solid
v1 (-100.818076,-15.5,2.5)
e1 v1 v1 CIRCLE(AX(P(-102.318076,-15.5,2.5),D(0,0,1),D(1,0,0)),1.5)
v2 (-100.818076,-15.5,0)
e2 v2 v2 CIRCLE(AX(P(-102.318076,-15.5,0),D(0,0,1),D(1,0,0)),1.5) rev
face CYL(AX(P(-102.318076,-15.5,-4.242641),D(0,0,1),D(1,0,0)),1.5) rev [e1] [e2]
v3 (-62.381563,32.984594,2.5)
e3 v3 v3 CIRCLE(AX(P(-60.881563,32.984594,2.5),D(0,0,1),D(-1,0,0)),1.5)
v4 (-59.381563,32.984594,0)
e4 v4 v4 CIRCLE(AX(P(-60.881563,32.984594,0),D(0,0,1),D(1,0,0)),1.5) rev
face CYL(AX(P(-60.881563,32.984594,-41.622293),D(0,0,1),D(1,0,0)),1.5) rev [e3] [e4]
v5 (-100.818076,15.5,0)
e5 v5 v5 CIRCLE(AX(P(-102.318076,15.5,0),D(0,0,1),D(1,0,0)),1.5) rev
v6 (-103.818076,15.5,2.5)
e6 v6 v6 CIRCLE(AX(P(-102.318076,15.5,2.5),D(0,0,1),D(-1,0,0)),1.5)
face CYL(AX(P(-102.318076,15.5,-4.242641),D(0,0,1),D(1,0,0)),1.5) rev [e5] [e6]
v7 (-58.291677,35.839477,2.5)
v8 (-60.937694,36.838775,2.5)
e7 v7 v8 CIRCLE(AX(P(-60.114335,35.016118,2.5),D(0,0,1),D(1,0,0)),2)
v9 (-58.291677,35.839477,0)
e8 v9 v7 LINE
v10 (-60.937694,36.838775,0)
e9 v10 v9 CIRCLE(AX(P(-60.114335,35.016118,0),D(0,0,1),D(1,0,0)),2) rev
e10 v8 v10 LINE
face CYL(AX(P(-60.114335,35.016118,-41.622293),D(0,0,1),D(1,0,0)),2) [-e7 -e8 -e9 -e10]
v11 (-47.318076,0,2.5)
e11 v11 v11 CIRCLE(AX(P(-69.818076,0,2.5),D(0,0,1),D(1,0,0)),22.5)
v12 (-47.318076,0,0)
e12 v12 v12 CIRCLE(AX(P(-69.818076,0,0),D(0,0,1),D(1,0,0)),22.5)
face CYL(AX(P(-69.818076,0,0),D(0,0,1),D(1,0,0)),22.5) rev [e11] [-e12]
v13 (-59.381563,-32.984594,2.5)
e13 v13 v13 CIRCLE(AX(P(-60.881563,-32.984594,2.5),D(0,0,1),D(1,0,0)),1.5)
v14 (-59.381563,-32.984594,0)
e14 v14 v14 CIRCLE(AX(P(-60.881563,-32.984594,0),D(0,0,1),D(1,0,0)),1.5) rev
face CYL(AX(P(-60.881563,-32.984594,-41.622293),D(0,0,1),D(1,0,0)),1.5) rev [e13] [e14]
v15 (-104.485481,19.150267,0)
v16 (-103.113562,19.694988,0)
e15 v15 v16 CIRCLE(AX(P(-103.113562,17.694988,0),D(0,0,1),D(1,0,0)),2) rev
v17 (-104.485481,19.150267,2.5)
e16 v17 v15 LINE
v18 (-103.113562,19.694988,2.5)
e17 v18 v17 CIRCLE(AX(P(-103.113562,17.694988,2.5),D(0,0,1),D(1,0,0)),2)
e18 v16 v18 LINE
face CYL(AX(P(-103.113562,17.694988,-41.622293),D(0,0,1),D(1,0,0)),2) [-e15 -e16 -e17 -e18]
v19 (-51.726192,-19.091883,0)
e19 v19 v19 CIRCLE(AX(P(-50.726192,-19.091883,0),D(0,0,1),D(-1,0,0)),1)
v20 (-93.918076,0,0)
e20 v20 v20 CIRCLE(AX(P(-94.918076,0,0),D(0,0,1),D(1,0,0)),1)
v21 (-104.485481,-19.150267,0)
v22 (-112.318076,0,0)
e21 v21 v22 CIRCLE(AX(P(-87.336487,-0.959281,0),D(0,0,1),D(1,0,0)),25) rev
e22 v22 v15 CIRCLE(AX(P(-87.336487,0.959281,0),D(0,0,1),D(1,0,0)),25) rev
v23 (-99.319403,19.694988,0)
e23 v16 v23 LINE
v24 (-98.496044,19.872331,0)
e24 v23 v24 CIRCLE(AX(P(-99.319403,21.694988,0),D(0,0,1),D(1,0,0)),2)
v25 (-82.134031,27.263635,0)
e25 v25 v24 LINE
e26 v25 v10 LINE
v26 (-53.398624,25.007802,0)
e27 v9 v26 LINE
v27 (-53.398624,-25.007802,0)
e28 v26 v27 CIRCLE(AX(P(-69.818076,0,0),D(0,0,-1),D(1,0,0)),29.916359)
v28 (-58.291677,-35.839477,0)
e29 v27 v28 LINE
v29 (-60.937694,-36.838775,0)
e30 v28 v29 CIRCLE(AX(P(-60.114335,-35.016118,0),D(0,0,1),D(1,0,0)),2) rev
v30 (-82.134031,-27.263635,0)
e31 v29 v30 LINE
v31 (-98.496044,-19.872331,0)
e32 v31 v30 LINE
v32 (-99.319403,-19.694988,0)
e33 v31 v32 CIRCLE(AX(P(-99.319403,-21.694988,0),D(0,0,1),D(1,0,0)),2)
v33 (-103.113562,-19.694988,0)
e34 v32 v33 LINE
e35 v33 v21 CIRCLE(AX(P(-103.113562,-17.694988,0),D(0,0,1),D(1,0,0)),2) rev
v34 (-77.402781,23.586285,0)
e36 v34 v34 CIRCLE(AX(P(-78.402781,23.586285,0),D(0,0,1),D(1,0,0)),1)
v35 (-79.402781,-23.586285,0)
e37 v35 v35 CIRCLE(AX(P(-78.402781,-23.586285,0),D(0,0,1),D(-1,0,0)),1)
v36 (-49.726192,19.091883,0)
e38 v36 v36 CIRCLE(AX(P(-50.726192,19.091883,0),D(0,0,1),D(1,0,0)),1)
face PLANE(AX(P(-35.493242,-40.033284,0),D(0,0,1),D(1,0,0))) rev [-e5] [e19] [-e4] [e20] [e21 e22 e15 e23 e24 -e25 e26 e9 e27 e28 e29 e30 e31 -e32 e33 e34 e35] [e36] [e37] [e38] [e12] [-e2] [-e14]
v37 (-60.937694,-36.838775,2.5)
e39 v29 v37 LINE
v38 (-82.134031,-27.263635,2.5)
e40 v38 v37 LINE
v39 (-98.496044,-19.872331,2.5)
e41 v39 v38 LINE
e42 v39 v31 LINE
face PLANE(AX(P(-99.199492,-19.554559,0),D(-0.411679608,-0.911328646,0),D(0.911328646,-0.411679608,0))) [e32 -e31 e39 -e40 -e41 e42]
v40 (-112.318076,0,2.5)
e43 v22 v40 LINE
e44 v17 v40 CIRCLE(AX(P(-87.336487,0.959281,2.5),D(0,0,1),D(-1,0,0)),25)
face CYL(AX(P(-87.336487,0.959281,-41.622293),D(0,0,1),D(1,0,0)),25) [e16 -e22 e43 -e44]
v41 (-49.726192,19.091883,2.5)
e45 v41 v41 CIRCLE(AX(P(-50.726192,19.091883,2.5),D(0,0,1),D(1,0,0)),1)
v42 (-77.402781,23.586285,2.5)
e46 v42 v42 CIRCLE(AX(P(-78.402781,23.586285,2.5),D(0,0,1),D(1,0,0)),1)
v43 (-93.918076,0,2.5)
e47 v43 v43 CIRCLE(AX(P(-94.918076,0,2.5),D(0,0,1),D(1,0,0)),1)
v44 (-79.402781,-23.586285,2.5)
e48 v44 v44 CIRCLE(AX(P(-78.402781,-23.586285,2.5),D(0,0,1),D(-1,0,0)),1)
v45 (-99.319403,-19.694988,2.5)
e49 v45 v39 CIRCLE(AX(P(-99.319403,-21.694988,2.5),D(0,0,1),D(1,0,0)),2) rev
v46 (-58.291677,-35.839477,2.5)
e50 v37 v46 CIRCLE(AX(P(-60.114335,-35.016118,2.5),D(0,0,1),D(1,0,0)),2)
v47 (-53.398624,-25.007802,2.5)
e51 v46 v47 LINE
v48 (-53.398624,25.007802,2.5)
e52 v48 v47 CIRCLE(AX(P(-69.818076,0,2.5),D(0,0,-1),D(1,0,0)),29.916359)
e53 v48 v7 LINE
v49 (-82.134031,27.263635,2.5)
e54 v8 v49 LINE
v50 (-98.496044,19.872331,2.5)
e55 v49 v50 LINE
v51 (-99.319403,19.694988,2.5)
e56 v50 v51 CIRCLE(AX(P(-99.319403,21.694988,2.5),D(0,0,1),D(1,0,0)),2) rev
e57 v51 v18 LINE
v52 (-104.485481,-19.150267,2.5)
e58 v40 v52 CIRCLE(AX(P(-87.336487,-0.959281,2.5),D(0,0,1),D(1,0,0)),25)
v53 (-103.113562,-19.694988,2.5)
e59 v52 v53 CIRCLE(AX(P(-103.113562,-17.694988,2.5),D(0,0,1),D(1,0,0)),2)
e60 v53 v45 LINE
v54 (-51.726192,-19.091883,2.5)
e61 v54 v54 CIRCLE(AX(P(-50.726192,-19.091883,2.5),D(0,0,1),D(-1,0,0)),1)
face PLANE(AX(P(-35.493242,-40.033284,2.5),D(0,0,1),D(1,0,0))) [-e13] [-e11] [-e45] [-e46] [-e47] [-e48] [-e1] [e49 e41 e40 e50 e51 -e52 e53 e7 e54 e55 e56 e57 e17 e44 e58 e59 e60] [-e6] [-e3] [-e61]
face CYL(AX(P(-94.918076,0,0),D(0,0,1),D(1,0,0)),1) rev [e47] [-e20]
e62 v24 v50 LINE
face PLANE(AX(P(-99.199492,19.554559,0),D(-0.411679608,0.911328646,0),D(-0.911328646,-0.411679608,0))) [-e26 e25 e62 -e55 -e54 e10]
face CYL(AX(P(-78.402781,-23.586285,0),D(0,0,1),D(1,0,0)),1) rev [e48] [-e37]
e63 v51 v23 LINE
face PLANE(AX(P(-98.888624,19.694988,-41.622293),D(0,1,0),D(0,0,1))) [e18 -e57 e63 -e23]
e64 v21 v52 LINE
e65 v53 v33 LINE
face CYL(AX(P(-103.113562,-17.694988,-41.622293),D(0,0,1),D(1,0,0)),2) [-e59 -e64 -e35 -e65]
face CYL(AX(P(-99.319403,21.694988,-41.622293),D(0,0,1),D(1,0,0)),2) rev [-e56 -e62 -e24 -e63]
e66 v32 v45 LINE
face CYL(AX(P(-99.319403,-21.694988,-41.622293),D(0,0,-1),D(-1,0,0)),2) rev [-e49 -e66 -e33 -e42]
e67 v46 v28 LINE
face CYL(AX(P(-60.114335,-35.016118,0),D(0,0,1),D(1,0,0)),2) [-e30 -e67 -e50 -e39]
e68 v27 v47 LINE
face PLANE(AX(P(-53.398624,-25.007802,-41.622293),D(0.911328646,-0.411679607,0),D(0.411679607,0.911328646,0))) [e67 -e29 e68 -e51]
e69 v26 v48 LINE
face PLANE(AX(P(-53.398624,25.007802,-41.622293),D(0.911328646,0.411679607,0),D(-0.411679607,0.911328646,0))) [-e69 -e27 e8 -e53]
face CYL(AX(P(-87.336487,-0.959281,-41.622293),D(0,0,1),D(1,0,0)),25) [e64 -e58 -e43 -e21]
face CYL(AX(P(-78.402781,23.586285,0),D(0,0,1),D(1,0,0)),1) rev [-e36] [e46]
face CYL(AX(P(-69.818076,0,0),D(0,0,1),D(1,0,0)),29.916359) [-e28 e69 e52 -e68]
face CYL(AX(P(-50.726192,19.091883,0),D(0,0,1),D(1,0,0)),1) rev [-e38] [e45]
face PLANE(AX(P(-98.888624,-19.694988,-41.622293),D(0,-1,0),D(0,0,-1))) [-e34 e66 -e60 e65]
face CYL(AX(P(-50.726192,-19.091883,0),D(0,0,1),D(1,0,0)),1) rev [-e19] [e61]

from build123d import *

# Parameters (mm, degrees)
CROQUIS1_R              = 2.25
CROQUIS1_R_2            = 3
CROQUIS1_R_3            = 1.5
CROQUIS1_R_4            = 2.249997567
SALIENTE_EXTRUIR1_DEPTH = 2.5
SALIENTE_EXTRUIR3_START = -2.5
CROQUIS6_R              = 2.250000066
CROQUIS6_R_2            = 1.5
CROQUIS6_R_3            = 2.25
SALIENTE_EXTRUIR3_DEPTH = 2.5
CROQUIS5_R              = 22.5
CROQUIS5_R_2            = 1
CORTAR_EXTRUIR5_DEPTH   = 2.5
CORTAR_EXTRUIR6_DEPTH   = 2.5
SALIENTE_EXTRUIR4_START = -2.5
CROQUIS11_R             = 1.5
CROQUIS11_R_2           = 1.500000006
SALIENTE_EXTRUIR4_DEPTH = 2.5
REDONDEO1_START         = -1
REDONDEO1_DEPTH         = 4
REDONDEO1_2_DEPTH       = 2.5
CROQUIS12_R             = 1.5
CORTAR_EXTRUIR7_DEPTH   = 2.5


with BuildPart() as part:
    # Croquis1 → Saliente-Extruir1 (new body)
    with BuildSketch(Plane.XY):
        with BuildLine():
            Line((-29.502526327, -44.949972179), (-23.17778065, -37.243838032))
            ThreePointArc((-23.17778065, -37.243838032), (-18.839723212, -32.444384768), (-14.046056443, -28.099933953))
            ThreePointArc((-14.046056443, -28.099933953), (-12.991422185, -27.658257217), (-11.867164621, -27.866527921))
            ThreePointArc((-11.867164621, -27.866527921), (-11.203313373, -28.112469078), (-10.500314, -28.196))
            Line((-10.500314, -28.196), (10.499686, -28.196))
            ThreePointArc((10.499686, -28.196), (11.203007921, -28.112542722), (11.867164264, -27.866528101))
            ThreePointArc((11.867164264, -27.866528101), (12.991422421, -27.658256674), (14.046057406, -28.099933523))
            ThreePointArc((14.046057406, -28.099933523), (18.839775902, -32.444337151), (23.177889012, -37.243749049))
            Line((23.177889012, -37.243749049), (29.502526012, -44.949972049))
            ThreePointArc((29.502526012, -44.949972049), (40.113877497, -46.255199126), (41.931739547, -35.719556022))
            Line((41.931739547, -35.719556022), (21.72923101, -5.566101046))
            ThreePointArc((21.72923101, -5.566101046), (20.036969431, -9.5e-08), (21.729230693, 5.566100954))
            Line((21.729230693, 5.566100954), (41.931739693, 35.719555954))
            ThreePointArc((41.931739693, 35.719555954), (40.113877277, 46.255198335), (29.502526336, 44.949972165))
            Line((29.502526336, 44.949972165), (23.17778065, 37.243838007))
            ThreePointArc((23.17778065, 37.243838007), (18.839723212, 32.444384742), (14.046056443, 28.099933927))
            ThreePointArc((14.046056443, 28.099933927), (12.991421988, 27.658257139), (11.867164252, 27.866528027))
            ThreePointArc((11.867164252, 27.866528027), (11.203313175, 28.112469073), (10.500314, 28.195999974))
            Line((10.500314, 28.195999974), (-10.500314, 28.195999974))
            ThreePointArc((-10.500314, 28.195999974), (-11.203313178, 28.112469098), (-11.867164264, 27.866528075))
            ThreePointArc((-11.867164264, 27.866528075), (-12.991422421, 27.658256648), (-14.046057406, 28.099933497))
            ThreePointArc((-14.046057406, 28.099933497), (-18.839775902, 32.444337126), (-23.177889012, 37.243749023))
            Line((-23.177889012, 37.243749023), (-29.502526012, 44.949972023))
            ThreePointArc((-29.502526012, 44.949972023), (-40.146302424, 46.230987494), (-41.886340556, 35.652554517))
            ThreePointArc((-41.886340556, 35.652554517), (-41.288874902, 25.337679941), (-50.13550001, 20.000000021))
            Line((-50.13550001, 20.000000021), (-97.31807601, 20.000000021))
            ThreePointArc((-97.31807601, 20.000000021), (-99.1994919, 19.554558541), (-100.681450855, 18.312809163))
            add(Edge.make_bspline(
                [(-107.31807554, 2.1e-08), (-107.252414123, 7.059743944), (-104.975710329, 13.164639039), (-100.681450855, 18.312809163)],
                knots=[0, 0, 0, 0, 1, 1, 1, 1], degree=3))
            add(Edge.make_bspline(
                [(-107.31807554, 2.1e-08), (-107.252414123, -7.059743902), (-104.975710329, -13.164638997), (-100.681450855, -18.312809121)],
                knots=[0, 0, 0, 0, 1, 1, 1, 1], degree=3))
            ThreePointArc((-100.681450855, -18.312809121), (-99.19949186, -19.554558345), (-97.31807601, -19.9999997))
            Line((-97.31807601, -19.9999997), (-50.13550001, -19.9999997))
            ThreePointArc((-50.13550001, -19.9999997), (-41.288874902, -25.33767962), (-41.886340556, -35.652554196))
            ThreePointArc((-41.886340556, -35.652554196), (-40.146302646, -46.230987042), (-29.502526327, -44.949972179))
        make_face()
        with Locations((-25.371621, 27.641642)):
            Circle(CROQUIS1_R, mode=Mode.SUBTRACT)
        with Locations((-35.493242035, 40.033284004)):
            Circle(CROQUIS1_R, mode=Mode.SUBTRACT)
        with Locations((-35.49324201, -40.0332837)):
            Circle(CROQUIS1_R, mode=Mode.SUBTRACT)
        with Locations((15.25, -15.25)):
            Circle(CROQUIS1_R_2, mode=Mode.SUBTRACT)
        with Locations((35.493242035, -40.03328403)):
            Circle(CROQUIS1_R, mode=Mode.SUBTRACT)
        with Locations((-15.25, 15.25)):
            Circle(CROQUIS1_R_2, mode=Mode.SUBTRACT)
        with Locations((-25.371621, -27.641642)):
            Circle(CROQUIS1_R, mode=Mode.SUBTRACT)
        with Locations((-35.318076, 15.5)):
            Circle(CROQUIS1_R_3, mode=Mode.SUBTRACT)
        with Locations((25.371621, -27.641642)):
            Circle(CROQUIS1_R, mode=Mode.SUBTRACT)
        with Locations((-15.25, -15.25)):
            Circle(CROQUIS1_R_2, mode=Mode.SUBTRACT)
        with Locations((-97.318076, 15.5)):
            Circle(CROQUIS1_R_3, mode=Mode.SUBTRACT)
        with Locations((15.25, 15.25)):
            Circle(CROQUIS1_R_2, mode=Mode.SUBTRACT)
        with Locations((-35.318076, -15.5)):
            Circle(CROQUIS1_R_3, mode=Mode.SUBTRACT)
        with Locations((25.371621, 27.641642)):
            Circle(CROQUIS1_R, mode=Mode.SUBTRACT)
        with Locations((-97.318076, -15.5)):
            Circle(CROQUIS1_R_3, mode=Mode.SUBTRACT)
        with Locations((35.493241695, 40.03328329)):
            Circle(CROQUIS1_R_4, mode=Mode.SUBTRACT)
        with BuildLine():
            Line((10.499686, -24.196), (-10.500314, -24.196))
            ThreePointArc((-10.500314, -24.196), (-11.500314, -25.196), (-10.500314, -26.196))
            Line((-10.500314, -26.196), (10.499686, -26.196))
            ThreePointArc((10.499686, -26.196), (11.499686, -25.196), (10.499686, -24.196))
        make_face(mode=Mode.SUBTRACT)
        with BuildLine():
            Line((10.499686, 24.196), (-10.500314, 24.196))
            ThreePointArc((-10.500314, 24.196), (-11.500314, 25.196), (-10.500314, 26.196))
            Line((-10.500314, 26.196), (10.499686, 26.196))
            ThreePointArc((10.499686, 26.196), (11.499686, 25.196), (10.499686, 24.196))
        make_face(mode=Mode.SUBTRACT)
    extrude(amount=SALIENTE_EXTRUIR1_DEPTH)


with BuildPart() as saliente_extruir3_tool:
    # Croquis6 → Saliente-Extruir3 (new body)
    # profile 1 of 10: a face of its own
    with BuildSketch(Plane.XY.offset(2.5).offset(SALIENTE_EXTRUIR3_START)):
        with Locations((-35.493242163, 40.033284025)):
            Circle(CROQUIS6_R)
        with Locations((-35.493242163, 40.033284025)):
            Circle(CROQUIS6_R_2, mode=Mode.SUBTRACT)
    # profile 2 of 10: a face of its own
    with BuildSketch(Plane.XY.offset(2.5).offset(SALIENTE_EXTRUIR3_START)):
        with Locations((-25.371621, 27.641642)):
            Circle(CROQUIS6_R_3)
        with Locations((-25.371621, 27.641642)):
            Circle(CROQUIS6_R_2, mode=Mode.SUBTRACT)
    # profile 3 of 10: a face of its own
    with BuildSketch(Plane.XY.offset(2.5).offset(SALIENTE_EXTRUIR3_START)):
        with Locations((25.371621, 27.641642)):
            Circle(CROQUIS6_R_3)
        with Locations(Location((25.371621, 27.641642, 0), (0, 0, 180))):
            Circle(CROQUIS6_R_2, mode=Mode.SUBTRACT)
    # profile 4 of 10: a face of its own
    with BuildSketch(Plane.XY.offset(2.5).offset(SALIENTE_EXTRUIR3_START)):
        with Locations((35.493242163, 40.033284025)):
            Circle(CROQUIS6_R)
        with Locations(Location((35.493242163, 40.033284025, 0), (0, 0, 180))):
            Circle(CROQUIS6_R_2, mode=Mode.SUBTRACT)
    # profile 5 of 10: a face of its own
    with BuildSketch(Plane.XY.offset(2.5).offset(SALIENTE_EXTRUIR3_START)):
        with Locations((35.493242163, -40.033284025)):
            Circle(CROQUIS6_R)
        with Locations((35.493242163, -40.033284025)):
            Circle(CROQUIS6_R_2, mode=Mode.SUBTRACT)
    # profile 6 of 10: a face of its own
    with BuildSketch(Plane.XY.offset(2.5).offset(SALIENTE_EXTRUIR3_START)):
        with Locations((25.371621, -27.641642)):
            Circle(CROQUIS6_R_3)
        with Locations((25.371621, -27.641642)):
            Circle(CROQUIS6_R_2, mode=Mode.SUBTRACT)
    # profile 7 of 10: a face of its own
    with BuildSketch(Plane.XY.offset(2.5).offset(SALIENTE_EXTRUIR3_START)):
        with Locations((-25.371621, -27.641642)):
            Circle(CROQUIS6_R_3)
        with Locations(Location((-25.371621, -27.641642, 0), (0, 0, 180))):
            Circle(CROQUIS6_R_2, mode=Mode.SUBTRACT)
    # profile 8 of 10: a face of its own
    with BuildSketch(Plane.XY.offset(2.5).offset(SALIENTE_EXTRUIR3_START)):
        with Locations((-35.493242163, -40.033284025)):
            Circle(CROQUIS6_R)
        with Locations(Location((-35.493242163, -40.033284025, 0), (0, 0, 180))):
            Circle(CROQUIS6_R_2, mode=Mode.SUBTRACT)
    # profile 9 of 10: a face of its own
    with BuildSketch(Plane.XY.offset(2.5).offset(SALIENTE_EXTRUIR3_START)):
        with BuildLine():
            Line((-99.1994919, 19.554558541), (-40.146302424, 46.230987494))
            ThreePointArc((-40.146302424, 46.230987494), (-43.140478024, 41.291171845), (-41.886340556, 35.652554517))
            ThreePointArc((-41.886340556, 35.652554517), (-41.288875033, 25.33768001), (-50.13550001, 20.000000021))
            Line((-50.13550001, 20.000000021), (-97.31807601, 20.000000021))
            ThreePointArc((-97.31807601, 20.000000021), (-98.214581153, 19.590579436), (-99.1994919, 19.554558541))
        make_face()
    # profile 10 of 10: a face of its own
    with BuildSketch(Plane.XY.offset(2.5).offset(SALIENTE_EXTRUIR3_START)):
        with BuildLine():
            Line((-50.13550001, -20.000000021), (-97.31807601, -20.000000021))
            ThreePointArc((-97.31807601, -20.000000021), (-98.214581153, -19.590579436), (-99.1994919, -19.554558541))
            Line((-99.1994919, -19.554558541), (-40.146302424, -46.230987494))
            ThreePointArc((-40.146302424, -46.230987494), (-43.140478024, -41.291171845), (-41.886340556, -35.652554517))
            ThreePointArc((-41.886340556, -35.652554517), (-41.288875033, -25.33768001), (-50.13550001, -20.000000021))
        make_face()
    extrude(amount=SALIENTE_EXTRUIR3_DEPTH)


with BuildPart() as part_1:
    add(part.part)


with BuildPart() as part_2:
    # Saliente-Extruir3: joined with saliente_extruir3_tool
    add(part_1.part.fuse(saliente_extruir3_tool.part, tol=0.00001))

    # Croquis5 → Cortar-Extruir5 (cut)
    with BuildSketch(Plane.XY.offset(2.5)):
        with Locations((-69.81807554, 2.1e-08)):
            Circle(CROQUIS5_R)
        with Locations((-78.402781137, 23.586284803)):
            Circle(CROQUIS5_R_2)
        with Locations((-94.91807554, 2.1e-08)):
            Circle(CROQUIS5_R_2)
        with Locations(Location((-78.402781137, -23.586284761, 0), (0, 0, 180))):
            Circle(CROQUIS5_R_2)
        with Locations((-50.726192448, 19.091883113)):
            Circle(CROQUIS5_R_2)
        with Locations(Location((-50.726192448, -19.091883071, 0), (0, 0, 180))):
            Circle(CROQUIS5_R_2)
    extrude(amount=-CORTAR_EXTRUIR5_DEPTH, mode=Mode.SUBTRACT)

    # Croquis10 → Cortar-Extruir6 (cut)
    with BuildSketch(Plane.XY.offset(2.5)):
        with BuildLine():
            ThreePointArc((-82.134030611, -27.263635217), (-39.901716207, 2.1e-08), (-82.134030596, 27.263635224))
            ThreePointArc((-82.134030596, 27.263635224), (79.537301339, -4.3e-08), (-82.134030611, -27.263635217))
        make_face()
    extrude(amount=-CORTAR_EXTRUIR6_DEPTH, mode=Mode.SUBTRACT)

    # Croquis11 → Saliente-Extruir4 (add)
    # profile 1 of 5: a face of its own
    with BuildSketch(Plane.XY.offset(2.5).offset(SALIENTE_EXTRUIR4_START)):
        with Locations((-97.318076, 15.5)):
            Circle(CROQUIS11_R)
    # profile 2 of 5: a face of its own
    with BuildSketch(Plane.XY.offset(2.5).offset(SALIENTE_EXTRUIR4_START)):
        with Locations((-97.318076, -15.5)):
            Circle(CROQUIS11_R)
    # profile 3 of 5: a face of its own
    with BuildSketch(Plane.XY.offset(2.5).offset(SALIENTE_EXTRUIR4_START)):
        with BuildLine():
            Line((-82.134030604, -27.263635221), (-59.115036511, -37.6621347))
            Line((-59.115036511, -37.6621347), (-53.398623675, -25.007801874))
            ThreePointArc((-53.398623675, -25.007801874), (-67.476736709, -29.824598689), (-82.134030604, -27.263635221))
        make_face()
        with Locations((-60.881562628, -32.984594162)):
            Circle(CROQUIS11_R_2, mode=Mode.SUBTRACT)
    # profile 4 of 5: a face of its own
    with BuildSketch(Plane.XY.offset(2.5).offset(SALIENTE_EXTRUIR4_START)):
        with BuildLine():
            Line((-53.398623675, 25.007801874), (-59.115036511, 37.6621347))
            Line((-59.115036511, 37.6621347), (-82.134030604, 27.263635221))
            ThreePointArc((-82.134030604, 27.263635221), (-67.476736709, 29.824598692), (-53.398623675, 25.007801874))
        make_face()
        with Locations((-60.881562628, 32.984594162)):
            Circle(CROQUIS11_R, mode=Mode.SUBTRACT)
    # profile 5 of 5: a face of its own
    with BuildSketch(Plane.XY.offset(2.5).offset(SALIENTE_EXTRUIR4_START)):
        with BuildLine():
            Line((-98.888624327, -19.694988496), (-103.888624327, -19.694988496))
            ThreePointArc((-103.888624327, -19.694988496), (-110.319866599, -10.796162946), (-112.31807554, 0))
            ThreePointArc((-112.31807554, 0), (-110.319866599, 10.796162946), (-103.888624327, 19.694988496))
            Line((-103.888624327, 19.694988496), (-98.888624327, 19.694988496))
            Line((-98.888624327, 19.694988496), (-99.19948756, 19.554560502))
            ThreePointArc((-99.19948756, 19.554560502), (-100.01296612, 19.020205966), (-100.681450855, 18.312809121))
            add(Edge.make_bspline(
                [(-107.31807554, -9.16e-07), (-107.252414182, 7.059743008), (-104.975710439, 13.164638122), (-100.681450855, 18.312809121)],
                knots=[0, 0, 0, 0, 1, 1, 1, 1], degree=3))
            add(Edge.make_bspline(
                [(-107.31807554, -9.16e-07), (-107.252414123, -7.059743902), (-104.975710329, -13.164638997), (-100.681450855, -18.312809121)],
                knots=[0, 0, 0, 0, 1, 1, 1, 1], degree=3))
            ThreePointArc((-100.681450855, -18.312809121), (-100.01296612, -19.020205966), (-99.19948756, -19.554560502))
            Line((-99.19948756, -19.554560502), (-98.888624327, -19.694988496))
        make_face()
    extrude(amount=SALIENTE_EXTRUIR4_DEPTH)

    # Redondeo1: read off the stored shape, not the designer's step
    # Redondeo1 outline → Redondeo1 (cut)
    with BuildSketch(Plane.XY.offset(REDONDEO1_START)):
        with BuildLine():
            ThreePointArc((-58.291677299, -35.839477414), (-59.407724144, -36.887134414), (-60.937693806, -36.838775491))
            Line((-60.937693806, -36.838775491), (-59.115036514, -37.662134706))
            Line((-59.115036514, -37.662134706), (-58.291677299, -35.839477414))
        make_face()
        with BuildLine():
            ThreePointArc((-103.11356154, -19.694988496), (-103.851613757, -19.553826554), (-104.48548109, -19.150267421))
            ThreePointArc((-104.48548109, -19.150267421), (-104.189253686, -19.425039593), (-103.888624327, -19.694988496))
            Line((-103.888624327, -19.694988496), (-103.11356154, -19.694988496))
        make_face()
        with BuildLine():
            Line((-59.115036514, 37.662134706), (-60.937693806, 36.838775491))
            ThreePointArc((-60.937693806, 36.838775491), (-59.407724144, 36.887134414), (-58.291677299, 35.839477414))
            Line((-58.291677299, 35.839477414), (-59.115036514, 37.662134706))
        make_face()
        with BuildLine():
            ThreePointArc((-104.48548109, 19.150267421), (-103.851613757, 19.553826554), (-103.11356154, 19.694988496))
            Line((-103.11356154, 19.694988496), (-103.888624327, 19.694988496))
            ThreePointArc((-103.888624327, 19.694988496), (-104.189253686, 19.425039593), (-104.48548109, 19.150267421))
        make_face()
    extrude(amount=REDONDEO1_DEPTH, mode=Mode.SUBTRACT)

    # Redondeo1 2 outline → Redondeo1 2 (add)
    with BuildSketch(Plane.XY):
        with BuildLine():
            Line((-98.888624327, -19.694988496), (-99.319402789, -19.694988496))
            ThreePointArc((-99.319402789, -19.694988496), (-98.898282013, -19.739826792), (-98.496043574, -19.872331205))
            Line((-98.496043574, -19.872331205), (-98.888624327, -19.694988496))
        make_face()
        with BuildLine():
            ThreePointArc((-98.496043574, 19.872331205), (-98.898282013, 19.739826792), (-99.319402789, 19.694988496))
            Line((-99.319402789, 19.694988496), (-98.888619399, 19.694988496))
            Line((-98.888619399, 19.694988496), (-98.496043574, 19.872331205))
        make_face()
    extrude(amount=REDONDEO1_2_DEPTH)

    # Croquis12 → Cortar-Extruir7 (cut)
    with BuildSketch(Plane.XY.offset(2.5)):
        with Locations((-102.318076, -15.5)):
            Circle(CROQUIS12_R)
        with Locations((-102.318076, 15.5)):
            Circle(CROQUIS12_R)
    extrude(amount=-CORTAR_EXTRUIR7_DEPTH, mode=Mode.SUBTRACT)


solid = part_2.part
